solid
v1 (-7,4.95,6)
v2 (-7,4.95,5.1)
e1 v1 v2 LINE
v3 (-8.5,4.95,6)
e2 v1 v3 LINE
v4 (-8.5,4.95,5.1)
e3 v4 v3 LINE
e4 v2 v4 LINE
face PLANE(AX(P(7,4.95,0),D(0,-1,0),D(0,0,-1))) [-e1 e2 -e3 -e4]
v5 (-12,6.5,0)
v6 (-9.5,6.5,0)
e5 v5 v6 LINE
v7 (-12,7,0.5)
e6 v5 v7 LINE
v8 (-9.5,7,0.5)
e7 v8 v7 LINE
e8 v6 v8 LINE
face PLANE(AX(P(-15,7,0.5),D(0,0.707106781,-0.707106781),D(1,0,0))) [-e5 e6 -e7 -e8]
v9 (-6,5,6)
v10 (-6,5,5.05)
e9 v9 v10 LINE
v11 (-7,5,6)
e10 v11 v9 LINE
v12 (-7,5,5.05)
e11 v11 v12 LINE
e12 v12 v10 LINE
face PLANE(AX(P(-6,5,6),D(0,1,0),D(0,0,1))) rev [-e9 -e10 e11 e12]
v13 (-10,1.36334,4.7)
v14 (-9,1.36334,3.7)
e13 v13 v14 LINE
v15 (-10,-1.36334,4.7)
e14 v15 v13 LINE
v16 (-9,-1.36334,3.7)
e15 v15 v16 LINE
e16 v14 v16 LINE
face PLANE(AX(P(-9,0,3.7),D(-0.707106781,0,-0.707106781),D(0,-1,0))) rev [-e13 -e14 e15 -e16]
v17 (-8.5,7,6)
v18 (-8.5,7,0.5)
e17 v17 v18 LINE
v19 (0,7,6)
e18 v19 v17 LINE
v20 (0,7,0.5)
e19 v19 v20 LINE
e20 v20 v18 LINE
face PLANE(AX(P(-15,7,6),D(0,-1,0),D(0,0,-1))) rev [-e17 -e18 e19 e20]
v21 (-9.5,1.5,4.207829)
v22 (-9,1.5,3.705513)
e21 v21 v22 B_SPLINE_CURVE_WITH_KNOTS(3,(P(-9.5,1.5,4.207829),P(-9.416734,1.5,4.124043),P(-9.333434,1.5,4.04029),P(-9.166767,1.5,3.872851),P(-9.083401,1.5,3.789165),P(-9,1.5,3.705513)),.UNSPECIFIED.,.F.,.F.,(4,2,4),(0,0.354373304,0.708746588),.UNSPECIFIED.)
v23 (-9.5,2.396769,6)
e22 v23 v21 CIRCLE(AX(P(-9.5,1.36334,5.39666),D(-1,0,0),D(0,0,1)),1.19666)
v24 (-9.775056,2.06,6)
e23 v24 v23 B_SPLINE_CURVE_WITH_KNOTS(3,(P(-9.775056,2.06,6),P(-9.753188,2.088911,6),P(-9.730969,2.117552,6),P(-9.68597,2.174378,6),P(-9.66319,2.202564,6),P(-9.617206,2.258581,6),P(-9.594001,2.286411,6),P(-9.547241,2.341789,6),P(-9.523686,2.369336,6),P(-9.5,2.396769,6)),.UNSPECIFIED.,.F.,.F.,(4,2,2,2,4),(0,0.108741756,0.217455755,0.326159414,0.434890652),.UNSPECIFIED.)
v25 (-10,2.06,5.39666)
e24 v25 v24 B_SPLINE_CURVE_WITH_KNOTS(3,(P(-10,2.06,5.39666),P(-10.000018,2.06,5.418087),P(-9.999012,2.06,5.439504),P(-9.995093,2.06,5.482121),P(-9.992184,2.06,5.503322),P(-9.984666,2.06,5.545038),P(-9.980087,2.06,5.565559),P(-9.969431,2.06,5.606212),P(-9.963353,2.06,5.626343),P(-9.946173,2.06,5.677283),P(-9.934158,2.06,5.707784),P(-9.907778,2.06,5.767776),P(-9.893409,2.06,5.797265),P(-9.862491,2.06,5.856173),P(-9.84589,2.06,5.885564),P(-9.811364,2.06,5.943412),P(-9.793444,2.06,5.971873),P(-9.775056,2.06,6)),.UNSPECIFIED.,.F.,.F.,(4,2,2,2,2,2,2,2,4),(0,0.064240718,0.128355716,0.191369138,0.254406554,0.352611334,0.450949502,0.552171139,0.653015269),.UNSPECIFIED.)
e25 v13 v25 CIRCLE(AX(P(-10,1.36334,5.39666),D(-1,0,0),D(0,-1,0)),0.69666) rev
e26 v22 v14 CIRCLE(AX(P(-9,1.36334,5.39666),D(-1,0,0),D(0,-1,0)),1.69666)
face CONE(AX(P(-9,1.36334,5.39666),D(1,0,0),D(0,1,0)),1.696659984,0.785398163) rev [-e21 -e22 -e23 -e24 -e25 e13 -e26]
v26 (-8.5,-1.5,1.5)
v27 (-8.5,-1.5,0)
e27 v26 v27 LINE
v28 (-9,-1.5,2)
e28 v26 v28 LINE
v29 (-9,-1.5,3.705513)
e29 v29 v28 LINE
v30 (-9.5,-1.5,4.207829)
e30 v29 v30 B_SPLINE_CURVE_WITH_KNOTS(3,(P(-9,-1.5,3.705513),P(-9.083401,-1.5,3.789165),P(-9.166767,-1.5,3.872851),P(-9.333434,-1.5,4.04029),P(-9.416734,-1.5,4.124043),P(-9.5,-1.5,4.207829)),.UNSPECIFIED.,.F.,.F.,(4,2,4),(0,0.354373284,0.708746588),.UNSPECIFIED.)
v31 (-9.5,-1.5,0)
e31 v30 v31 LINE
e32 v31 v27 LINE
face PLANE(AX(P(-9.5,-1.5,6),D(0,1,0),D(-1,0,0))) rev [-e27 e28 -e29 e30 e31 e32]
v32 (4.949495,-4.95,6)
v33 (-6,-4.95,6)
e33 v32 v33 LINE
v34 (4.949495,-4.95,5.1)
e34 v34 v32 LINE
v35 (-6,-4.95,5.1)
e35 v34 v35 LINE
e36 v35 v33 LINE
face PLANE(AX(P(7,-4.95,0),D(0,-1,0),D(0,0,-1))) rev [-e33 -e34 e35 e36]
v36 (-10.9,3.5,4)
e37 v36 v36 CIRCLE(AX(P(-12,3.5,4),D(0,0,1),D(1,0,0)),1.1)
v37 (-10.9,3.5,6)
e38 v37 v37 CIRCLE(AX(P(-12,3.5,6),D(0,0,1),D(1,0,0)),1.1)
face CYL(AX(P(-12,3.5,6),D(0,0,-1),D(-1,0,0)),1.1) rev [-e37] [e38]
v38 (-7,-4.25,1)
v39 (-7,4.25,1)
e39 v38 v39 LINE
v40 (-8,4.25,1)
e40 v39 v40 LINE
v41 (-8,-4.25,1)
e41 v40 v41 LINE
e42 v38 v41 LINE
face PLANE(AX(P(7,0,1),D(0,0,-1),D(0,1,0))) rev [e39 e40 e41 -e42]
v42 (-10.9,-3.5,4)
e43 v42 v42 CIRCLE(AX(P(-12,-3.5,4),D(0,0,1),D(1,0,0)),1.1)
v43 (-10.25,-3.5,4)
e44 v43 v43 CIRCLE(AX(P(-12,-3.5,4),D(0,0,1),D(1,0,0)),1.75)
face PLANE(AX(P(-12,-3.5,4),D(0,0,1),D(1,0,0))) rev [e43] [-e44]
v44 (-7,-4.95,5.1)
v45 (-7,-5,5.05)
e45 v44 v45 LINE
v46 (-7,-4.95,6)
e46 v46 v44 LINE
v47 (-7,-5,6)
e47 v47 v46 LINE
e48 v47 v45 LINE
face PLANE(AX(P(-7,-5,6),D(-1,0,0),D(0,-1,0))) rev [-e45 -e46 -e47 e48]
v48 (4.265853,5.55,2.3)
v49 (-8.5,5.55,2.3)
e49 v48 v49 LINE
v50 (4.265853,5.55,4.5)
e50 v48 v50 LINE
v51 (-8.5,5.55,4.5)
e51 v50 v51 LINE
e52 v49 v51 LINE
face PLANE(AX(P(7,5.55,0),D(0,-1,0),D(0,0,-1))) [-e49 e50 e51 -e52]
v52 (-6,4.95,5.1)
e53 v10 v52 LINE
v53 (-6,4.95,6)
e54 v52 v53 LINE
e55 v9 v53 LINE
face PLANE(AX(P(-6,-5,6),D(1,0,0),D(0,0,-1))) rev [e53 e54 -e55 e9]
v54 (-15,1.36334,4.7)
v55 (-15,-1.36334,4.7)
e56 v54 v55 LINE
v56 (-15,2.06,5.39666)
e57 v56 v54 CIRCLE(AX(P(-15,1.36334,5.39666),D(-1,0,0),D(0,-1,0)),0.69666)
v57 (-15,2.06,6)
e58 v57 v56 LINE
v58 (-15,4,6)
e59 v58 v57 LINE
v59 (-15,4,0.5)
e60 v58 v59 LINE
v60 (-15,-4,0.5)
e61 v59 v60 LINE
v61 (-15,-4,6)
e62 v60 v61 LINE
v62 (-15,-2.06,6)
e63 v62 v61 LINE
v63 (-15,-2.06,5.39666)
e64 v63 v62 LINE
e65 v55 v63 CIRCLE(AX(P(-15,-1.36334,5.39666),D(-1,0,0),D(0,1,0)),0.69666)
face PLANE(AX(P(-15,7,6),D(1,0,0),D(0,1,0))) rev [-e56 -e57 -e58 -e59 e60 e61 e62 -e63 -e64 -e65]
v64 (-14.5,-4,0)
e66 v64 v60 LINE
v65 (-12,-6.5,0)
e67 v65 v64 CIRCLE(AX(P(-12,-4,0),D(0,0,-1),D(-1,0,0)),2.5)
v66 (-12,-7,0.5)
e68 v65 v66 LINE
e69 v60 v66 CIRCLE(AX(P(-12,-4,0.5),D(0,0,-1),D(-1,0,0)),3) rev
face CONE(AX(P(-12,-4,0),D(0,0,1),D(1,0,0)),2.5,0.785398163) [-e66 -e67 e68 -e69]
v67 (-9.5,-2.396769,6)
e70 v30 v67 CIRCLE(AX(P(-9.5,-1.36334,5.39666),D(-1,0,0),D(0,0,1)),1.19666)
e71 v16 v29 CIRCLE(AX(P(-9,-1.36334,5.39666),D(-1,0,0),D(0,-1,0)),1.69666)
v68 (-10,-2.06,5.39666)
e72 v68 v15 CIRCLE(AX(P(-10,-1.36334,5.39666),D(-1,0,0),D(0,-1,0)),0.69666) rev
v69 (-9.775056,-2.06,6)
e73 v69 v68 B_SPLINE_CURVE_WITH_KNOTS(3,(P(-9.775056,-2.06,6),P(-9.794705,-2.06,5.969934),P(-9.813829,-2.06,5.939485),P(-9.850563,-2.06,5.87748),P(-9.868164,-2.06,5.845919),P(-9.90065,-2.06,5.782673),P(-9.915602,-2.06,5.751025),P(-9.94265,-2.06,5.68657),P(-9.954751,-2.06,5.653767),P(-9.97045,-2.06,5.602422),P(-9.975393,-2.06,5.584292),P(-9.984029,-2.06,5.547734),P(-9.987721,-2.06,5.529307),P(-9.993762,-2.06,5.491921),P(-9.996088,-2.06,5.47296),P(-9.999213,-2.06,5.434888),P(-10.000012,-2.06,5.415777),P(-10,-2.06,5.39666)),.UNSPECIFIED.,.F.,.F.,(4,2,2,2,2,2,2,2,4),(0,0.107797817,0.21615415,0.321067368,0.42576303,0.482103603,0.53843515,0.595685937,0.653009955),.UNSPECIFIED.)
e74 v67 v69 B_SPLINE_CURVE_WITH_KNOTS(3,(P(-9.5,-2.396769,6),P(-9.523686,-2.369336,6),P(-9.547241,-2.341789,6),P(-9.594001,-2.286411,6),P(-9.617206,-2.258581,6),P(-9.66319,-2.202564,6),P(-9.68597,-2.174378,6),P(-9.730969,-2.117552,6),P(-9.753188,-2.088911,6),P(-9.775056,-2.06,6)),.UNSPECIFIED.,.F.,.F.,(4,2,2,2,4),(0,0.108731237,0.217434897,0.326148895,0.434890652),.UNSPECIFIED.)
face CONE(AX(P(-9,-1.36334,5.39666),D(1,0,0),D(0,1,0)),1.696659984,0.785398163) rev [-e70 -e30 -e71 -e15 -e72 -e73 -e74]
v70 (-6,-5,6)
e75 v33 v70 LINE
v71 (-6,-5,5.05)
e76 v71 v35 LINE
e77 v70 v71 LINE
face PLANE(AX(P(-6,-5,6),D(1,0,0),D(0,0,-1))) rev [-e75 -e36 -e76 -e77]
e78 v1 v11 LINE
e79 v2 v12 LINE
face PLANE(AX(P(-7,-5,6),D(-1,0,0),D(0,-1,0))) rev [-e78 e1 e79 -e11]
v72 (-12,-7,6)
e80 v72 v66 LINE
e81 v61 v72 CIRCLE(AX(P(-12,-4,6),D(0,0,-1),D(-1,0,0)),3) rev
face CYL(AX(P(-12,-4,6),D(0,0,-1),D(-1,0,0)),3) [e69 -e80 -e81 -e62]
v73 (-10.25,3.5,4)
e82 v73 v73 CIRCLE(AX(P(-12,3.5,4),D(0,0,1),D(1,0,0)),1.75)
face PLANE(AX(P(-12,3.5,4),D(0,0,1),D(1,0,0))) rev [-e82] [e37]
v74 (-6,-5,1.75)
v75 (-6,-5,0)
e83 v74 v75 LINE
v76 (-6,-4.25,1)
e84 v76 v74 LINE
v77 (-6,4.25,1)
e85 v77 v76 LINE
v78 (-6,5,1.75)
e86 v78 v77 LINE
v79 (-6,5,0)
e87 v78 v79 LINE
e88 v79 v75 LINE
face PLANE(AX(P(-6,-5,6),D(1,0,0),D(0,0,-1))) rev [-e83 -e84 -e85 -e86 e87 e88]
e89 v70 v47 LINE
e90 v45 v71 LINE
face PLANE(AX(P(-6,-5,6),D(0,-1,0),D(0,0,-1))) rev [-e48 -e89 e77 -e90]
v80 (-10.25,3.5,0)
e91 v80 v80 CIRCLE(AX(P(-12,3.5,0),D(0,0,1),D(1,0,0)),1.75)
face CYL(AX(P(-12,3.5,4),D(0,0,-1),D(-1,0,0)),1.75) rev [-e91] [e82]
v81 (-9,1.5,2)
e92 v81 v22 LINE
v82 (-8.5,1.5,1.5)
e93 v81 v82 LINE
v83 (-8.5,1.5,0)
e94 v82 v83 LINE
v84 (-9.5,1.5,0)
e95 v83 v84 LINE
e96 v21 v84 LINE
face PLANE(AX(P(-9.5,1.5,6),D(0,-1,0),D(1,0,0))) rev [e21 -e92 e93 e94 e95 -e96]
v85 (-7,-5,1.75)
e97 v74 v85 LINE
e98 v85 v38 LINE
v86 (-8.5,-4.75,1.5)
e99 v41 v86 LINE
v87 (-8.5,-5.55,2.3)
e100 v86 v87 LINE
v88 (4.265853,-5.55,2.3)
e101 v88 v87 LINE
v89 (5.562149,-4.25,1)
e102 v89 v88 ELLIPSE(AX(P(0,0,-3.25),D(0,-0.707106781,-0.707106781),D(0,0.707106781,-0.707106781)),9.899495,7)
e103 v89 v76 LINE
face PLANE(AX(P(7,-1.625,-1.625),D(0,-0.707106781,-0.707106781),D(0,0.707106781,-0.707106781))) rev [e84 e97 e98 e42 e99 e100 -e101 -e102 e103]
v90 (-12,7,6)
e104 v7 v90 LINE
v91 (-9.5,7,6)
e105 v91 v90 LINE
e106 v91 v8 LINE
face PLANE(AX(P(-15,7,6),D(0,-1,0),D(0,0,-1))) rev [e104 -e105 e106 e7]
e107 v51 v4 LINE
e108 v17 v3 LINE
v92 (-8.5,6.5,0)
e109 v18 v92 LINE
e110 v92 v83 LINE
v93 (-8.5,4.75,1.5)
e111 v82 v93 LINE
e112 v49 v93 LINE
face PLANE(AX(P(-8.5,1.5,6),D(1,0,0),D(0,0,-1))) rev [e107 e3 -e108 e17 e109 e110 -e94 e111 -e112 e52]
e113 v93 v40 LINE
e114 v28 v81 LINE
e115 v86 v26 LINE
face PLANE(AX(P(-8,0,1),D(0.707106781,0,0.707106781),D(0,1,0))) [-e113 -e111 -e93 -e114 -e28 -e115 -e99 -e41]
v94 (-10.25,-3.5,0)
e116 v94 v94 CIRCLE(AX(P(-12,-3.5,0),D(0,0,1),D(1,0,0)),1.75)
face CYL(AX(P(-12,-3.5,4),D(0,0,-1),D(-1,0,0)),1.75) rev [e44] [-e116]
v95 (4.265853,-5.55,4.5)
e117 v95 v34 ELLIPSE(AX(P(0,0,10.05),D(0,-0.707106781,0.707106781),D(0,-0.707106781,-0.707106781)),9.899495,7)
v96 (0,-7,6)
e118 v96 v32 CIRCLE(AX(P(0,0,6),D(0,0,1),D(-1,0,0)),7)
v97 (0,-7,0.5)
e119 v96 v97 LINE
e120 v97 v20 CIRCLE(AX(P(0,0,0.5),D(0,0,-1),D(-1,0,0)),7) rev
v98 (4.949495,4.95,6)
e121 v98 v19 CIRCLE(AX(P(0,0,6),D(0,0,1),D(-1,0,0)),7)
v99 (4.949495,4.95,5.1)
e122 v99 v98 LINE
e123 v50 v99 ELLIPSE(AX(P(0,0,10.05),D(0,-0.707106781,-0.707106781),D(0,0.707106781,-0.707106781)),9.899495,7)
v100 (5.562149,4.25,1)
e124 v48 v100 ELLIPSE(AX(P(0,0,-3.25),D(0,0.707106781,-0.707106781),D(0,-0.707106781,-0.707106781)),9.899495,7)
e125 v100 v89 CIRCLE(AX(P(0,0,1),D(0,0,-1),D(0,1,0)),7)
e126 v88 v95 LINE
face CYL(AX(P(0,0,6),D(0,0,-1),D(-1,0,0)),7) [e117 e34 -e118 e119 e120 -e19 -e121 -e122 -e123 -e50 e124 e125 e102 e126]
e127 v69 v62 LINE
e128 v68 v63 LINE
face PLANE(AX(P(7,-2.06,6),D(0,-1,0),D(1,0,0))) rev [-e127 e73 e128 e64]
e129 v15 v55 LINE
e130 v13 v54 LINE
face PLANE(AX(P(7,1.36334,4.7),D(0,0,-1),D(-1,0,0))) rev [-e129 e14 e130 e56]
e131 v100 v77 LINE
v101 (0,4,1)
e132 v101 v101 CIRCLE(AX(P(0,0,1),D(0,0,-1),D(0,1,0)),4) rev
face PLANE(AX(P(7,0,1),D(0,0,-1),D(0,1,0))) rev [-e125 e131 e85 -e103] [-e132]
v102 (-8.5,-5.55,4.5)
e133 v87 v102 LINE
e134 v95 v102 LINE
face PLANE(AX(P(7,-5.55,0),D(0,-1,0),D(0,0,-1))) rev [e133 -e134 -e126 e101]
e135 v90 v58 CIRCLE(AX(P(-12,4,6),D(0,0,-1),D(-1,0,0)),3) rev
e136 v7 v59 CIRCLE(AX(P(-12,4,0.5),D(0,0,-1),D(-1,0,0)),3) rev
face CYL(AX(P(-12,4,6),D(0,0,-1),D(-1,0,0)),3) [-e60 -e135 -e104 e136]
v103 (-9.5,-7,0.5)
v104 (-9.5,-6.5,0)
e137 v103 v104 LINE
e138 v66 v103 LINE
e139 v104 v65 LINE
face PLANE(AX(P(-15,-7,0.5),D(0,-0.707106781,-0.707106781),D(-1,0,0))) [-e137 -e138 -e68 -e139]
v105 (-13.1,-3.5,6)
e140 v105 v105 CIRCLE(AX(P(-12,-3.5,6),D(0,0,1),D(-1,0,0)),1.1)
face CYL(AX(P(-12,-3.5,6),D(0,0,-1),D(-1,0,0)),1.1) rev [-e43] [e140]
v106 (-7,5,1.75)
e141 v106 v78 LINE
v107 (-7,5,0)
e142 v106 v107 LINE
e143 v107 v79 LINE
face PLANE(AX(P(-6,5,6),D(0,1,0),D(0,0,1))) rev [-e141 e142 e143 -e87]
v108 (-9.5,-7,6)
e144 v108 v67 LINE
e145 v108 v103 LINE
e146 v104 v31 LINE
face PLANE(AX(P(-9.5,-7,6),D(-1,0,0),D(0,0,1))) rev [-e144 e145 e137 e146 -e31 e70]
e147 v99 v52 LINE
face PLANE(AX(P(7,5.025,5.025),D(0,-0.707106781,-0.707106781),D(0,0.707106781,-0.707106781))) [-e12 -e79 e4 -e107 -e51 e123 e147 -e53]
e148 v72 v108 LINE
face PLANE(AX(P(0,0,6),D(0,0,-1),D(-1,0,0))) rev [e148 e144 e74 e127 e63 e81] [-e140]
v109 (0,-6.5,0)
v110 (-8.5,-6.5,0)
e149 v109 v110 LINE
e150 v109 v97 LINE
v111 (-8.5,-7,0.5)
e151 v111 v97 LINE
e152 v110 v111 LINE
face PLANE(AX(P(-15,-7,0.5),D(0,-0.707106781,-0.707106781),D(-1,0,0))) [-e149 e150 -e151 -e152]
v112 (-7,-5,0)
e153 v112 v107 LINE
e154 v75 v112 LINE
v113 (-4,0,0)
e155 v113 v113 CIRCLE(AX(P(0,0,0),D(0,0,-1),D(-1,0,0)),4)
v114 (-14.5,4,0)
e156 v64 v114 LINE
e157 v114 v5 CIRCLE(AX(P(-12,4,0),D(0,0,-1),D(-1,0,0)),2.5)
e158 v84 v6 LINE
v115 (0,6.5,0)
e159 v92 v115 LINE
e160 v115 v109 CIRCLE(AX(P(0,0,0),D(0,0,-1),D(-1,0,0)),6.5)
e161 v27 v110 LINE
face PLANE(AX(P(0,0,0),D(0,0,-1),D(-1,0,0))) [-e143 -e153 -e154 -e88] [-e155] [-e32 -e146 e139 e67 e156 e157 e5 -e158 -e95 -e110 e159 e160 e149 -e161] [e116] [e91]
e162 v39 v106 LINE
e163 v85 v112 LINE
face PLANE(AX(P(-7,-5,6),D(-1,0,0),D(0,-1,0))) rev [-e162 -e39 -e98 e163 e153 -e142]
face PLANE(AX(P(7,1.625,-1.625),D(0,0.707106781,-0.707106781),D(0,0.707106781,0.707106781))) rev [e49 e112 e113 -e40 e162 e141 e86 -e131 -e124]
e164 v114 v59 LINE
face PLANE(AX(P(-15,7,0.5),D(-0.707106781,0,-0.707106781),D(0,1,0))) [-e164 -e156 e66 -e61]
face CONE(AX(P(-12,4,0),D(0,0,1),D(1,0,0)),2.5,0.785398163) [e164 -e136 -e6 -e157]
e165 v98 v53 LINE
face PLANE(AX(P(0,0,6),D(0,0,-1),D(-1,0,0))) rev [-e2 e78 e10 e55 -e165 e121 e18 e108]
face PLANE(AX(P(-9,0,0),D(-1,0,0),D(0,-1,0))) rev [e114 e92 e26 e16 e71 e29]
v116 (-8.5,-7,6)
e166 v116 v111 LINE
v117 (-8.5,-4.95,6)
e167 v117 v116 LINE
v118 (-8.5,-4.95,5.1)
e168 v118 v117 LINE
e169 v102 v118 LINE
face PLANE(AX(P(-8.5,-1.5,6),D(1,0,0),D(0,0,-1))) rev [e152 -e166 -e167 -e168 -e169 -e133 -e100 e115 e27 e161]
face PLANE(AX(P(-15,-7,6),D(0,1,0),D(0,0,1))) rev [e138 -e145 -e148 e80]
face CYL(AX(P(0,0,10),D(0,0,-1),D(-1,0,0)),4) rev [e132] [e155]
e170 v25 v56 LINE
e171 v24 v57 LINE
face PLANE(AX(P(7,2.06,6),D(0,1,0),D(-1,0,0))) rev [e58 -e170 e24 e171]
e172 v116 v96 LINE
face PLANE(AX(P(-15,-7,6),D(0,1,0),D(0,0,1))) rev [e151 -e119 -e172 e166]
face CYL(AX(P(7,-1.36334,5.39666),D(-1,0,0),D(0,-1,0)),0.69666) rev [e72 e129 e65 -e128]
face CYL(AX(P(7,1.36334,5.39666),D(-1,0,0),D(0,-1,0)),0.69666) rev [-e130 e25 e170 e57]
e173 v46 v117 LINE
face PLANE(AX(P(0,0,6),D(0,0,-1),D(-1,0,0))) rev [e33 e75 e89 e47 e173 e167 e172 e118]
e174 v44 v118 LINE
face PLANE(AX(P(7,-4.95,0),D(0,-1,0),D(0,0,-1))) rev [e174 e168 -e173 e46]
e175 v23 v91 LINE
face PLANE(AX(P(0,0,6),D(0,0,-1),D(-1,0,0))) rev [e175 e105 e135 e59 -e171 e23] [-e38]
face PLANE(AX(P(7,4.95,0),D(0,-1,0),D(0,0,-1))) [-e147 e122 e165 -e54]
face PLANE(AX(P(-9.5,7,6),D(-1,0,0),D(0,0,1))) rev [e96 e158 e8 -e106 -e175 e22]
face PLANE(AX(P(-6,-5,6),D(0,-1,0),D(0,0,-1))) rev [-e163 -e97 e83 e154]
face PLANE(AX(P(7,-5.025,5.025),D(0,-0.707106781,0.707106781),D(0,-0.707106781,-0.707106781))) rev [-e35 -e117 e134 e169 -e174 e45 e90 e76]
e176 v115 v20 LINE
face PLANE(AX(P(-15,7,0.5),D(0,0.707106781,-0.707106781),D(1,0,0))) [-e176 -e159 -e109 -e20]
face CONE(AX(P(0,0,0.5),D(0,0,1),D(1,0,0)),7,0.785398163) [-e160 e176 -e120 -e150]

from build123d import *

# Parameters (mm, degrees)
SKETCH1_R             = 1.1
BOSS_EXTRUDE1_DEPTH   = 6
SKETCH2_R             = 4
CUT_EXTRUDE2_DEPTH    = 10
CUT_EXTRUDE4_START    = -6
CUT_EXTRUDE4_DEPTH    = 18.853720884
CUT_EXTRUDE6_DEPTH    = 24.853720884
CROQUIS1_W            = 1
CROQUIS1_H            = 5.5
CROQUIS1_H_2          = 10
CORTAR_EXTRUIR1_DEPTH = 18.606816862
FILLET4_R             = 3
FILLET1_SIZE          = 0.5
SKETCH5_R             = 1.75
CUT_EXTRUDE5_DEPTH    = 4
CHAFL_N1_SIZE         = 1


with BuildPart() as part:
    # Sketch1 → Boss-Extrude1 (new body)
    with BuildSketch(Plane.XY):
        with BuildLine():
            Line((-15, 7), (0, 7))
            ThreePointArc((0, 7), (7, 0), (0, -7))
            Line((0, -7), (-15, -7))
            Line((-15, -7), (-15, 7))
        make_face()
        with Locations((-12, 3.5)):
            Circle(SKETCH1_R, mode=Mode.SUBTRACT)
        with Locations(Location((-12, -3.5, 0), (0, 0, 180))):
            Circle(SKETCH1_R, mode=Mode.SUBTRACT)
    extrude(amount=BOSS_EXTRUDE1_DEPTH)

    # Sketch2 → Cut-Extrude2 (cut)
    with BuildSketch(Plane(origin=(0, 0, 0), x_dir=(-1, 0, 0), z_dir=(0, 0, -1))):
        Circle(SKETCH2_R)
    extrude(amount=-CUT_EXTRUDE2_DEPTH, mode=Mode.SUBTRACT)

    # Sketch7 → Cut-Extrude4 (cut, through all)
    with BuildSketch(Plane.ZY.offset(15).offset(CUT_EXTRUDE4_START)):
        Polygon((2.3, 5.55), (1, 4.25), (1, -4.25), (2.3, -5.55), (4.5, -5.55), (5.1, -4.95), (6, -4.95), (6, 4.95), (5.1, 4.95), (4.5, 5.55), align=None)
    extrude(amount=-CUT_EXTRUDE4_DEPTH, mode=Mode.SUBTRACT)

    # Sketch8 → Cut-Extrude6 (cut, through all)
    with BuildSketch(Plane.ZY.offset(15)):
        with BuildLine():
            Line((4.7, 1.363340016), (4.7, -1.363340016))
            ThreePointArc((4.7, -1.363340016), (4.904046985, -1.855953015), (5.396659984, -2.06))
            Line((5.396659984, -2.06), (6, -2.06))
            Line((6, -2.06), (6, 2.06))
            Line((6, 2.06), (5.396659984, 2.06))
            ThreePointArc((5.396659984, 2.06), (4.904046985, 1.855953015), (4.7, 1.363340016))
        make_face()
    extrude(amount=-CUT_EXTRUDE6_DEPTH, mode=Mode.SUBTRACT)

    # Croquis1 → Cortar-Extruir1 (cut, through all)
    with BuildSketch(Plane(origin=(0, 0, 0), x_dir=(-1, 0, 0), z_dir=(0, 0, -1))):
        with Locations((9, 4.25)):
            Rectangle(CROQUIS1_W, CROQUIS1_H)
        with Locations((6.5, 0)):
            Rectangle(CROQUIS1_W, CROQUIS1_H_2)
        with Locations((9, -4.25)):
            Rectangle(CROQUIS1_W, CROQUIS1_H)
    extrude(amount=-CORTAR_EXTRUIR1_DEPTH, mode=Mode.SUBTRACT)

    # Fillet4
    fillet4_edges = [part.edges().sort_by_distance(p)[0] for p in [
        (-15, -7, 3),
        (-15, 7, 3),
    ]]
    fillet(fillet4_edges, radius=FILLET4_R)

    # Fillet1
    fillet1_edges = [part.edges().sort_by_distance(p)[0] for p in [
        (-4.25, -7, 0),
        (-10.75, 7, 0),
        (-15, 0, 0),
        (-10.75, -7, 0),
        (-14.121320344, -6.121320344, 0),
        (-14.121320344, 6.121320344, 0),
        (-4.25, 7, 0),
        (7, 0, 0),
    ]]
    chamfer(fillet1_edges, length=FILLET1_SIZE)

    # Sketch5 → Cut-Extrude5 (cut)
    with BuildSketch(Plane.XY):
        with Locations((-12, 3.5)):
            Circle(SKETCH5_R)
        with Locations((-12, -3.5)):
            Circle(SKETCH5_R)
    extrude(amount=CUT_EXTRUDE5_DEPTH, mode=Mode.SUBTRACT)

    # Chaflán1
    chafl_n1_edges = [part.edges().sort_by_distance(p)[0] for p in [
        (-9, 0, 1),
    ]]
    chamfer(chafl_n1_edges, length=CHAFL_N1_SIZE)
    # the kernel refuses this chamfer: 1 mm, written as the material it takes off along each edge
    with BuildSketch(Plane(origin=(-9, 1.363340016, 4.7), x_dir=(0, 0, -1), z_dir=(0, -1, 0))) as chafl_n1_2_piece_1:
        with BuildLine():
            Line((1.028284271, 0.028284271), (-0.028284271, -1.028284271))
            Line((-0.028284271, -1.028284271), (-0.048284271, -1.028284271))
            ThreePointArc((-0.048284271, -1.028284271), (-0.02, -0.514142136), (-0.02, 0))
            Line((-0.02, 0), (0, 0.02))
            ThreePointArc((0, 0.02), (0.514142136, 0.02), (1.028284271, 0.048284271))
            Line((1.028284271, 0.048284271), (1.028284271, 0.028284271))
        make_face()
    extrude(amount=2.726680031, mode=Mode.SUBTRACT)
    with BuildSketch(Plane(origin=(-9, 1.363340016, 5.396659984), x_dir=(0, -0.6796769184207155, 0.7335116131092404), z_dir=(0, -0.7335116131092404, -0.6796769184207155))) as chafl_n1_2_piece_2:
        with BuildLine():
            Line((1.724944256, -0.028284271), (0.668375713, 1.028284271))
            Line((0.668375713, 1.028284271), (0.648375713, 1.028284271))
            ThreePointArc((0.648375713, 1.028284271), (0.676659984, 0.514142136), (0.676659984, 0))
            Line((0.676659984, 0), (0.696659984, -0.02))
            ThreePointArc((0.696659984, -0.02), (1.21080212, -0.02), (1.724944256, -0.048284271))
            Line((1.724944256, -0.048284271), (1.724944256, -0.028284271))
        make_face()
    revolve(axis=Axis((-9, 1.363340016, 5.396659984), (-1, 0, 0)), revolution_arc=222.818401466, mode=Mode.SUBTRACT)
    with BuildSketch(Plane(origin=(-9, -1.363340016, 5.396659984), x_dir=(0, 0, -1), z_dir=(0, 1, 0))) as chafl_n1_2_piece_3:
        with BuildLine():
            Line((1.724944256, -0.028284271), (0.668375713, 1.028284271))
            Line((0.668375713, 1.028284271), (0.648375713, 1.028284271))
            ThreePointArc((0.648375713, 1.028284271), (0.676659984, 0.514142136), (0.676659984, 0))
            Line((0.676659984, 0), (0.696659984, -0.02))
            ThreePointArc((0.696659984, -0.02), (1.21080212, -0.02), (1.724944256, -0.048284271))
            Line((1.724944256, -0.048284271), (1.724944256, -0.028284271))
        make_face()
    revolve(axis=Axis((-9, -1.363340016, 5.396659984), (-1, 0, 0)), revolution_arc=222.818401466, mode=Mode.SUBTRACT)


solid = part.part
